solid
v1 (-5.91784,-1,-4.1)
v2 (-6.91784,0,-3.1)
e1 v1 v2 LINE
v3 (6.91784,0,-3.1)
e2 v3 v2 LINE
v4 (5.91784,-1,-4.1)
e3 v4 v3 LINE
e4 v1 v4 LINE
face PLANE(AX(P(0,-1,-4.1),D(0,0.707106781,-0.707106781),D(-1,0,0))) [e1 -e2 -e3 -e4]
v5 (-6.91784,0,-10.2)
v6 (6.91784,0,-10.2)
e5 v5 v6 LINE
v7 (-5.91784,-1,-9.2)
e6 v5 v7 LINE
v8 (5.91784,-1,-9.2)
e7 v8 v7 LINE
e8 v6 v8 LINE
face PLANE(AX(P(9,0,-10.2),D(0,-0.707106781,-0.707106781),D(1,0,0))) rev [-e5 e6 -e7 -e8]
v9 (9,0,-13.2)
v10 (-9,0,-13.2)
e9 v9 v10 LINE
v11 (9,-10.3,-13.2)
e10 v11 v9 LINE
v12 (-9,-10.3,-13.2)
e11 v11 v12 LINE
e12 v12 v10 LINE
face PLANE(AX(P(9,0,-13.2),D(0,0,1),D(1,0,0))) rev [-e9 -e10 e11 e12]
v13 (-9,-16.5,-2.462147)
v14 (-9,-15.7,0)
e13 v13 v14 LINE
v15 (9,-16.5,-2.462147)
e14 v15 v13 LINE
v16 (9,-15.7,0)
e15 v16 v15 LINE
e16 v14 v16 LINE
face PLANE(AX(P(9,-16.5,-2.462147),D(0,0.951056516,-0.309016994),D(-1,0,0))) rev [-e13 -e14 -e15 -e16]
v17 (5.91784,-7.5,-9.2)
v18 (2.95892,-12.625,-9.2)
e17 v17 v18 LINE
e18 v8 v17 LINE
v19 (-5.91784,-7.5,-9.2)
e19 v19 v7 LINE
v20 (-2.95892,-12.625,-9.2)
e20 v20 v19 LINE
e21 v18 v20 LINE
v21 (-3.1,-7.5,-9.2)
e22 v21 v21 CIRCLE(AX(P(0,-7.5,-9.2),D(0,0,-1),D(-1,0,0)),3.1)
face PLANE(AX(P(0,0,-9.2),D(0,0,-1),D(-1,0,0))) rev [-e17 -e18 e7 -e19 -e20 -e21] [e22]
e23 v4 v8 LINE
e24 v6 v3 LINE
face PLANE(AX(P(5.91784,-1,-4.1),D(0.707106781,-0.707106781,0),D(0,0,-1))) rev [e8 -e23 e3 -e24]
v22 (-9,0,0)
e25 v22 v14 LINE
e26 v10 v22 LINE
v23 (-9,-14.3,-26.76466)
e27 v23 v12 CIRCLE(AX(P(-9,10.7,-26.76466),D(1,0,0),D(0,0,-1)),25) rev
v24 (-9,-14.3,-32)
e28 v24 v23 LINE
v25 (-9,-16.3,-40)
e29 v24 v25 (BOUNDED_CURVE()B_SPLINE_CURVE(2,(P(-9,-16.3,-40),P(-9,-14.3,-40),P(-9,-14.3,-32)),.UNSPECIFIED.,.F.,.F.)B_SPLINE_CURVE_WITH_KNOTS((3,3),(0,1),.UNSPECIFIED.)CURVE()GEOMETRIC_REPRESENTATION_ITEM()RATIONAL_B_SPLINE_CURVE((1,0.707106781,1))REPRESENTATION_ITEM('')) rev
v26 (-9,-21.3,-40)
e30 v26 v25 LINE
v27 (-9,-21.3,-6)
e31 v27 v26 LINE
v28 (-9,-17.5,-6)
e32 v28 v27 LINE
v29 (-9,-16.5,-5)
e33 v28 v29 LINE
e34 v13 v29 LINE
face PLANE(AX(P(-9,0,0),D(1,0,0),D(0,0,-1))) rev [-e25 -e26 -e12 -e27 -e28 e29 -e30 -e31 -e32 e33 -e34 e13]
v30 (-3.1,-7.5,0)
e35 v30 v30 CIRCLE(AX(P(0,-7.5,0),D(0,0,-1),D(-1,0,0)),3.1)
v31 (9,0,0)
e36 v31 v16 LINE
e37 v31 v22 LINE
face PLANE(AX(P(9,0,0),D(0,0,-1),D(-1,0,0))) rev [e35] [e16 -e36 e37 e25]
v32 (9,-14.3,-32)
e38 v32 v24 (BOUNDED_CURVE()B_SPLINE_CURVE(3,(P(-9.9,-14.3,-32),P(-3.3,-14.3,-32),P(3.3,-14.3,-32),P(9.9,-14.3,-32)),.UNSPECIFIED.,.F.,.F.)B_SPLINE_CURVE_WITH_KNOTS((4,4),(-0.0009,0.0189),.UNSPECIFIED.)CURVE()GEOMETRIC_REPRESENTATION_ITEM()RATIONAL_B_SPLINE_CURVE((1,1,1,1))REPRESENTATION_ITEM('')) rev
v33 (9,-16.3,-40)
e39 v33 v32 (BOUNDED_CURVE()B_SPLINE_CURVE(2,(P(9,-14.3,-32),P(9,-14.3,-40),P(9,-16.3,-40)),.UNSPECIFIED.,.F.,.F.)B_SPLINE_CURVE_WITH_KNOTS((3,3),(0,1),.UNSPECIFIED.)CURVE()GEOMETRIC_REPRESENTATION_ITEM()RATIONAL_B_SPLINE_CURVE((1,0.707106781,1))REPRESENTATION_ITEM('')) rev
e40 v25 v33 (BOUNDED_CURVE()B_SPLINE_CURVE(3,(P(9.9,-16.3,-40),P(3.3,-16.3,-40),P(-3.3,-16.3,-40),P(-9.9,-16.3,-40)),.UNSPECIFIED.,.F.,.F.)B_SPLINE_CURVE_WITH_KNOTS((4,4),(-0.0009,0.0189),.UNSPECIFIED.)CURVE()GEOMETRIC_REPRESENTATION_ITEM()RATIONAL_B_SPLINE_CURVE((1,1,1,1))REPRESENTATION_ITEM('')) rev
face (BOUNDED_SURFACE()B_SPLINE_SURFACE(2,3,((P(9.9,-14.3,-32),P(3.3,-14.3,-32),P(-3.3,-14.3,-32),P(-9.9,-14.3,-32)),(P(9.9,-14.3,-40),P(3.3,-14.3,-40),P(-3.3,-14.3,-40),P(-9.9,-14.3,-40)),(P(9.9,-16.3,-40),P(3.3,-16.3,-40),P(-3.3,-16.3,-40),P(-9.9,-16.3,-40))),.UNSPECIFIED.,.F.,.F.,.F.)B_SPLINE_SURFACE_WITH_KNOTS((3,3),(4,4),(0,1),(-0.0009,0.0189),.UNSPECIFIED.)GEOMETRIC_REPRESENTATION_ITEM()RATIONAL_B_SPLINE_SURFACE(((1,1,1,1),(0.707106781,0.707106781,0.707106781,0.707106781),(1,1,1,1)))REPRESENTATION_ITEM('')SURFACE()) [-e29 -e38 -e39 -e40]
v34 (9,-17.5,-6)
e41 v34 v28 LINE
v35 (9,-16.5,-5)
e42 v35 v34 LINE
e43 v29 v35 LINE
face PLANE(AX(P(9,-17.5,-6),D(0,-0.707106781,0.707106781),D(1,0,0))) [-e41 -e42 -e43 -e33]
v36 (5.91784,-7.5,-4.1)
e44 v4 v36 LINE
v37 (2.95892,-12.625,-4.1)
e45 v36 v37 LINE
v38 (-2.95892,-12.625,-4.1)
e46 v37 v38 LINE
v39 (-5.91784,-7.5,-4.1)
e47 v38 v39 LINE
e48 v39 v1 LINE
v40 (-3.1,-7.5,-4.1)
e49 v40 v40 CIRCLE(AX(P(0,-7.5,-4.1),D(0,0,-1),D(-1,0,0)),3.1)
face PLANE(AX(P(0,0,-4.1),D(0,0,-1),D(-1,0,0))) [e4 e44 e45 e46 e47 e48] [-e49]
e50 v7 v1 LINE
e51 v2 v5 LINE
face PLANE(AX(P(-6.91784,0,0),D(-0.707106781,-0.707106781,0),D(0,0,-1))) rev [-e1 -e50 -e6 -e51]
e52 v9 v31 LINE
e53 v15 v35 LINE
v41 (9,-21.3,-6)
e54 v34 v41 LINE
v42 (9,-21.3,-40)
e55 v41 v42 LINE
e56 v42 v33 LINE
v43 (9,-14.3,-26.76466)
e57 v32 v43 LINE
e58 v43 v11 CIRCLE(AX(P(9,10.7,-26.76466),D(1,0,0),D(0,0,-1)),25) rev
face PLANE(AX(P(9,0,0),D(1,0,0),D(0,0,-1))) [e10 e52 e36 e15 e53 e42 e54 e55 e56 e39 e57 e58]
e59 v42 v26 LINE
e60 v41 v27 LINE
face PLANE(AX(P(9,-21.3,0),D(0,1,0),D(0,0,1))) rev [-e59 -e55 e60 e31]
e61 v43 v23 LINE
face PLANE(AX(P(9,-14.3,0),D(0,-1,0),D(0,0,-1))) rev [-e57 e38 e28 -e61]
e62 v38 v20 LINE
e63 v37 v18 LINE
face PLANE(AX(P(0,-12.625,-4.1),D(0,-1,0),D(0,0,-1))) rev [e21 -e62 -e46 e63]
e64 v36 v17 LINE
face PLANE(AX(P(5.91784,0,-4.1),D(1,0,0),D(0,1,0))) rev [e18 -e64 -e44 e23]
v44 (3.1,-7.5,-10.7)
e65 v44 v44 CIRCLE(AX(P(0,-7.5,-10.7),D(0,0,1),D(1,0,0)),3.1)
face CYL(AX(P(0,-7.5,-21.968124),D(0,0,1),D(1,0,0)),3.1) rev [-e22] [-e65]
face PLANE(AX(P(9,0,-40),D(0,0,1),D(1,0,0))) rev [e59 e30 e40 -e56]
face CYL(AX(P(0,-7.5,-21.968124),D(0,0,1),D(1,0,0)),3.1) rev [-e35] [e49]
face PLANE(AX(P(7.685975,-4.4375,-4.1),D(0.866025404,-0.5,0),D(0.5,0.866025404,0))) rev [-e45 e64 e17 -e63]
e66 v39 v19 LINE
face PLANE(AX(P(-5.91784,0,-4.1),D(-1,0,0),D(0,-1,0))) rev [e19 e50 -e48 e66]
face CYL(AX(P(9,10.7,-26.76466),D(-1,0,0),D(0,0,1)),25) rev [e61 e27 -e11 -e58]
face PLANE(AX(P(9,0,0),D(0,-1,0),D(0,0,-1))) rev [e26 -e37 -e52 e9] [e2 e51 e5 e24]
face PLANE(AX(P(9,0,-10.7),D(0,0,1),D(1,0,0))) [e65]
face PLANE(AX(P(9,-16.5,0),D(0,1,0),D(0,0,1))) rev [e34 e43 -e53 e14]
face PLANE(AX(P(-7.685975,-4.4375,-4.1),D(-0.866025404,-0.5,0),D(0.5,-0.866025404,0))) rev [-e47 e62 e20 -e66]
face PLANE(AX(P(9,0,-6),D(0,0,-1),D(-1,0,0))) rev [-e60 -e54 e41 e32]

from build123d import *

# Parameters (mm, degrees)
RESSALTO_EXTRUS_O1_DEPTH = 9
CHANFRO5_SIZE            = 1
CHAMFER1_SIZE            = 0.8
CHAMFER1_SIZE2           = 2.46214683
ESBO_O3_R                = 3.1
CORTE_EXTRUS_O1_DEPTH    = 10.7
CORTE_EXTRUS_O4_START    = -4
CORTE_EXTRUS_O4_DEPTH    = 5.1
CHAMFER2_SIZE            = 1
FILETE1_SIZE             = 2
FILETE1_SIZE_2           = 8


with BuildPart() as part:
    # Esboço2 → Ressalto-extrusão1 (new, symmetric)
    with BuildSketch(Plane(origin=(0, 0, 0), x_dir=(0, 0, -1), z_dir=(1, 0, 0))):
        with BuildLine():
            Line((0, 0), (0, -16.5))
            Line((0, -16.5), (6, -16.5))
            Line((6, -16.5), (6, -21.3))
            Line((6, -21.3), (40, -21.3))
            Line((40, -21.3), (40, -14.3))
            Line((40, -14.3), (26.764659966, -14.3))
            ThreePointArc((26.764659966, -14.3), (19.693592154, -13.279157617), (13.2, -10.3))
            Line((13.2, -10.3), (13.2, 0))
            Line((13.2, 0), (0, 0))
        make_face()
    extrude(amount=RESSALTO_EXTRUS_O1_DEPTH, both=True)

    # Chanfro5
    chanfro5_edges = [part.edges().sort_by_distance(p)[0] for p in [
        (0, -16.5, -6),
    ]]
    chamfer(chanfro5_edges, length=CHANFRO5_SIZE)

    # Chamfer1
    chamfer1_edges = [part.edges().sort_by_distance(p)[0] for p in [
        (0, -16.5, 0),
    ]]
    chamfer1_side = [part.faces().sort_by_distance(p)[0] for p in [
        (0, -8.25, 0),
    ]]
    chamfer(chamfer1_edges, length=CHAMFER1_SIZE, length2=CHAMFER1_SIZE2, reference=chamfer1_side[0])

    # Esboço3 → Corte-extrusão1 (cut)
    with BuildSketch(Plane(origin=(0, 0, 0), x_dir=(-1, 0, 0), z_dir=(0, 0, -1))):
        with Locations(Location((0, -7.5, 0), (0, 0, 180))):
            Circle(ESBO_O3_R)
    extrude(amount=CORTE_EXTRUS_O1_DEPTH, mode=Mode.SUBTRACT)

    # Esboço7 → Corte-extrusão4 (cut)
    with BuildSketch(Plane(origin=(0, 0, -13.2), x_dir=(-1, 0, 0), z_dir=(0, 0, -1)).offset(CORTE_EXTRUS_O4_START)):
        Polygon((2.95892013, -2.375), (5.917840259, -7.5), (5.917840259, 0), (-5.917840259, 0), (-5.917840259, -7.5), (-2.95892013, -2.375), align=None)
        Polygon((2.95892013, -12.625), (5.917840259, -7.5), (2.95892013, -2.375), (-2.95892013, -2.375), (-5.917840259, -7.5), (-2.95892013, -12.625), align=None)
    extrude(amount=-CORTE_EXTRUS_O4_DEPTH, mode=Mode.SUBTRACT)

    # Chamfer2
    chamfer2_edges = [part.edges().sort_by_distance(p)[0] for p in [
        (0, 0, -4.1),
        (5.917840259, 0, -6.65),
        (-5.917840259, 0, -6.65),
        (0, 0, -9.2),
    ]]
    chamfer(chamfer2_edges, length=CHAMFER2_SIZE)

    # Filete1
    # an asymmetric fillet: 8, 2 mm, written as the material it takes off along each edge
    with BuildSketch(Plane(origin=(-29, -14.3, -40), x_dir=(0, -1, 0), z_dir=(1, 0, 0))) as filete1_piece_1:
        with BuildLine():
            Bezier((FILETE1_SIZE, 0), (0, 0), (0, -FILETE1_SIZE_2), weights=[1, 0.707106781, 1])
            Line((0, -FILETE1_SIZE_2), (0, 0))
            Line((0, 0), (FILETE1_SIZE, 0))
        make_face()
    extrude(amount=58, mode=Mode.SUBTRACT)


solid = part.part
